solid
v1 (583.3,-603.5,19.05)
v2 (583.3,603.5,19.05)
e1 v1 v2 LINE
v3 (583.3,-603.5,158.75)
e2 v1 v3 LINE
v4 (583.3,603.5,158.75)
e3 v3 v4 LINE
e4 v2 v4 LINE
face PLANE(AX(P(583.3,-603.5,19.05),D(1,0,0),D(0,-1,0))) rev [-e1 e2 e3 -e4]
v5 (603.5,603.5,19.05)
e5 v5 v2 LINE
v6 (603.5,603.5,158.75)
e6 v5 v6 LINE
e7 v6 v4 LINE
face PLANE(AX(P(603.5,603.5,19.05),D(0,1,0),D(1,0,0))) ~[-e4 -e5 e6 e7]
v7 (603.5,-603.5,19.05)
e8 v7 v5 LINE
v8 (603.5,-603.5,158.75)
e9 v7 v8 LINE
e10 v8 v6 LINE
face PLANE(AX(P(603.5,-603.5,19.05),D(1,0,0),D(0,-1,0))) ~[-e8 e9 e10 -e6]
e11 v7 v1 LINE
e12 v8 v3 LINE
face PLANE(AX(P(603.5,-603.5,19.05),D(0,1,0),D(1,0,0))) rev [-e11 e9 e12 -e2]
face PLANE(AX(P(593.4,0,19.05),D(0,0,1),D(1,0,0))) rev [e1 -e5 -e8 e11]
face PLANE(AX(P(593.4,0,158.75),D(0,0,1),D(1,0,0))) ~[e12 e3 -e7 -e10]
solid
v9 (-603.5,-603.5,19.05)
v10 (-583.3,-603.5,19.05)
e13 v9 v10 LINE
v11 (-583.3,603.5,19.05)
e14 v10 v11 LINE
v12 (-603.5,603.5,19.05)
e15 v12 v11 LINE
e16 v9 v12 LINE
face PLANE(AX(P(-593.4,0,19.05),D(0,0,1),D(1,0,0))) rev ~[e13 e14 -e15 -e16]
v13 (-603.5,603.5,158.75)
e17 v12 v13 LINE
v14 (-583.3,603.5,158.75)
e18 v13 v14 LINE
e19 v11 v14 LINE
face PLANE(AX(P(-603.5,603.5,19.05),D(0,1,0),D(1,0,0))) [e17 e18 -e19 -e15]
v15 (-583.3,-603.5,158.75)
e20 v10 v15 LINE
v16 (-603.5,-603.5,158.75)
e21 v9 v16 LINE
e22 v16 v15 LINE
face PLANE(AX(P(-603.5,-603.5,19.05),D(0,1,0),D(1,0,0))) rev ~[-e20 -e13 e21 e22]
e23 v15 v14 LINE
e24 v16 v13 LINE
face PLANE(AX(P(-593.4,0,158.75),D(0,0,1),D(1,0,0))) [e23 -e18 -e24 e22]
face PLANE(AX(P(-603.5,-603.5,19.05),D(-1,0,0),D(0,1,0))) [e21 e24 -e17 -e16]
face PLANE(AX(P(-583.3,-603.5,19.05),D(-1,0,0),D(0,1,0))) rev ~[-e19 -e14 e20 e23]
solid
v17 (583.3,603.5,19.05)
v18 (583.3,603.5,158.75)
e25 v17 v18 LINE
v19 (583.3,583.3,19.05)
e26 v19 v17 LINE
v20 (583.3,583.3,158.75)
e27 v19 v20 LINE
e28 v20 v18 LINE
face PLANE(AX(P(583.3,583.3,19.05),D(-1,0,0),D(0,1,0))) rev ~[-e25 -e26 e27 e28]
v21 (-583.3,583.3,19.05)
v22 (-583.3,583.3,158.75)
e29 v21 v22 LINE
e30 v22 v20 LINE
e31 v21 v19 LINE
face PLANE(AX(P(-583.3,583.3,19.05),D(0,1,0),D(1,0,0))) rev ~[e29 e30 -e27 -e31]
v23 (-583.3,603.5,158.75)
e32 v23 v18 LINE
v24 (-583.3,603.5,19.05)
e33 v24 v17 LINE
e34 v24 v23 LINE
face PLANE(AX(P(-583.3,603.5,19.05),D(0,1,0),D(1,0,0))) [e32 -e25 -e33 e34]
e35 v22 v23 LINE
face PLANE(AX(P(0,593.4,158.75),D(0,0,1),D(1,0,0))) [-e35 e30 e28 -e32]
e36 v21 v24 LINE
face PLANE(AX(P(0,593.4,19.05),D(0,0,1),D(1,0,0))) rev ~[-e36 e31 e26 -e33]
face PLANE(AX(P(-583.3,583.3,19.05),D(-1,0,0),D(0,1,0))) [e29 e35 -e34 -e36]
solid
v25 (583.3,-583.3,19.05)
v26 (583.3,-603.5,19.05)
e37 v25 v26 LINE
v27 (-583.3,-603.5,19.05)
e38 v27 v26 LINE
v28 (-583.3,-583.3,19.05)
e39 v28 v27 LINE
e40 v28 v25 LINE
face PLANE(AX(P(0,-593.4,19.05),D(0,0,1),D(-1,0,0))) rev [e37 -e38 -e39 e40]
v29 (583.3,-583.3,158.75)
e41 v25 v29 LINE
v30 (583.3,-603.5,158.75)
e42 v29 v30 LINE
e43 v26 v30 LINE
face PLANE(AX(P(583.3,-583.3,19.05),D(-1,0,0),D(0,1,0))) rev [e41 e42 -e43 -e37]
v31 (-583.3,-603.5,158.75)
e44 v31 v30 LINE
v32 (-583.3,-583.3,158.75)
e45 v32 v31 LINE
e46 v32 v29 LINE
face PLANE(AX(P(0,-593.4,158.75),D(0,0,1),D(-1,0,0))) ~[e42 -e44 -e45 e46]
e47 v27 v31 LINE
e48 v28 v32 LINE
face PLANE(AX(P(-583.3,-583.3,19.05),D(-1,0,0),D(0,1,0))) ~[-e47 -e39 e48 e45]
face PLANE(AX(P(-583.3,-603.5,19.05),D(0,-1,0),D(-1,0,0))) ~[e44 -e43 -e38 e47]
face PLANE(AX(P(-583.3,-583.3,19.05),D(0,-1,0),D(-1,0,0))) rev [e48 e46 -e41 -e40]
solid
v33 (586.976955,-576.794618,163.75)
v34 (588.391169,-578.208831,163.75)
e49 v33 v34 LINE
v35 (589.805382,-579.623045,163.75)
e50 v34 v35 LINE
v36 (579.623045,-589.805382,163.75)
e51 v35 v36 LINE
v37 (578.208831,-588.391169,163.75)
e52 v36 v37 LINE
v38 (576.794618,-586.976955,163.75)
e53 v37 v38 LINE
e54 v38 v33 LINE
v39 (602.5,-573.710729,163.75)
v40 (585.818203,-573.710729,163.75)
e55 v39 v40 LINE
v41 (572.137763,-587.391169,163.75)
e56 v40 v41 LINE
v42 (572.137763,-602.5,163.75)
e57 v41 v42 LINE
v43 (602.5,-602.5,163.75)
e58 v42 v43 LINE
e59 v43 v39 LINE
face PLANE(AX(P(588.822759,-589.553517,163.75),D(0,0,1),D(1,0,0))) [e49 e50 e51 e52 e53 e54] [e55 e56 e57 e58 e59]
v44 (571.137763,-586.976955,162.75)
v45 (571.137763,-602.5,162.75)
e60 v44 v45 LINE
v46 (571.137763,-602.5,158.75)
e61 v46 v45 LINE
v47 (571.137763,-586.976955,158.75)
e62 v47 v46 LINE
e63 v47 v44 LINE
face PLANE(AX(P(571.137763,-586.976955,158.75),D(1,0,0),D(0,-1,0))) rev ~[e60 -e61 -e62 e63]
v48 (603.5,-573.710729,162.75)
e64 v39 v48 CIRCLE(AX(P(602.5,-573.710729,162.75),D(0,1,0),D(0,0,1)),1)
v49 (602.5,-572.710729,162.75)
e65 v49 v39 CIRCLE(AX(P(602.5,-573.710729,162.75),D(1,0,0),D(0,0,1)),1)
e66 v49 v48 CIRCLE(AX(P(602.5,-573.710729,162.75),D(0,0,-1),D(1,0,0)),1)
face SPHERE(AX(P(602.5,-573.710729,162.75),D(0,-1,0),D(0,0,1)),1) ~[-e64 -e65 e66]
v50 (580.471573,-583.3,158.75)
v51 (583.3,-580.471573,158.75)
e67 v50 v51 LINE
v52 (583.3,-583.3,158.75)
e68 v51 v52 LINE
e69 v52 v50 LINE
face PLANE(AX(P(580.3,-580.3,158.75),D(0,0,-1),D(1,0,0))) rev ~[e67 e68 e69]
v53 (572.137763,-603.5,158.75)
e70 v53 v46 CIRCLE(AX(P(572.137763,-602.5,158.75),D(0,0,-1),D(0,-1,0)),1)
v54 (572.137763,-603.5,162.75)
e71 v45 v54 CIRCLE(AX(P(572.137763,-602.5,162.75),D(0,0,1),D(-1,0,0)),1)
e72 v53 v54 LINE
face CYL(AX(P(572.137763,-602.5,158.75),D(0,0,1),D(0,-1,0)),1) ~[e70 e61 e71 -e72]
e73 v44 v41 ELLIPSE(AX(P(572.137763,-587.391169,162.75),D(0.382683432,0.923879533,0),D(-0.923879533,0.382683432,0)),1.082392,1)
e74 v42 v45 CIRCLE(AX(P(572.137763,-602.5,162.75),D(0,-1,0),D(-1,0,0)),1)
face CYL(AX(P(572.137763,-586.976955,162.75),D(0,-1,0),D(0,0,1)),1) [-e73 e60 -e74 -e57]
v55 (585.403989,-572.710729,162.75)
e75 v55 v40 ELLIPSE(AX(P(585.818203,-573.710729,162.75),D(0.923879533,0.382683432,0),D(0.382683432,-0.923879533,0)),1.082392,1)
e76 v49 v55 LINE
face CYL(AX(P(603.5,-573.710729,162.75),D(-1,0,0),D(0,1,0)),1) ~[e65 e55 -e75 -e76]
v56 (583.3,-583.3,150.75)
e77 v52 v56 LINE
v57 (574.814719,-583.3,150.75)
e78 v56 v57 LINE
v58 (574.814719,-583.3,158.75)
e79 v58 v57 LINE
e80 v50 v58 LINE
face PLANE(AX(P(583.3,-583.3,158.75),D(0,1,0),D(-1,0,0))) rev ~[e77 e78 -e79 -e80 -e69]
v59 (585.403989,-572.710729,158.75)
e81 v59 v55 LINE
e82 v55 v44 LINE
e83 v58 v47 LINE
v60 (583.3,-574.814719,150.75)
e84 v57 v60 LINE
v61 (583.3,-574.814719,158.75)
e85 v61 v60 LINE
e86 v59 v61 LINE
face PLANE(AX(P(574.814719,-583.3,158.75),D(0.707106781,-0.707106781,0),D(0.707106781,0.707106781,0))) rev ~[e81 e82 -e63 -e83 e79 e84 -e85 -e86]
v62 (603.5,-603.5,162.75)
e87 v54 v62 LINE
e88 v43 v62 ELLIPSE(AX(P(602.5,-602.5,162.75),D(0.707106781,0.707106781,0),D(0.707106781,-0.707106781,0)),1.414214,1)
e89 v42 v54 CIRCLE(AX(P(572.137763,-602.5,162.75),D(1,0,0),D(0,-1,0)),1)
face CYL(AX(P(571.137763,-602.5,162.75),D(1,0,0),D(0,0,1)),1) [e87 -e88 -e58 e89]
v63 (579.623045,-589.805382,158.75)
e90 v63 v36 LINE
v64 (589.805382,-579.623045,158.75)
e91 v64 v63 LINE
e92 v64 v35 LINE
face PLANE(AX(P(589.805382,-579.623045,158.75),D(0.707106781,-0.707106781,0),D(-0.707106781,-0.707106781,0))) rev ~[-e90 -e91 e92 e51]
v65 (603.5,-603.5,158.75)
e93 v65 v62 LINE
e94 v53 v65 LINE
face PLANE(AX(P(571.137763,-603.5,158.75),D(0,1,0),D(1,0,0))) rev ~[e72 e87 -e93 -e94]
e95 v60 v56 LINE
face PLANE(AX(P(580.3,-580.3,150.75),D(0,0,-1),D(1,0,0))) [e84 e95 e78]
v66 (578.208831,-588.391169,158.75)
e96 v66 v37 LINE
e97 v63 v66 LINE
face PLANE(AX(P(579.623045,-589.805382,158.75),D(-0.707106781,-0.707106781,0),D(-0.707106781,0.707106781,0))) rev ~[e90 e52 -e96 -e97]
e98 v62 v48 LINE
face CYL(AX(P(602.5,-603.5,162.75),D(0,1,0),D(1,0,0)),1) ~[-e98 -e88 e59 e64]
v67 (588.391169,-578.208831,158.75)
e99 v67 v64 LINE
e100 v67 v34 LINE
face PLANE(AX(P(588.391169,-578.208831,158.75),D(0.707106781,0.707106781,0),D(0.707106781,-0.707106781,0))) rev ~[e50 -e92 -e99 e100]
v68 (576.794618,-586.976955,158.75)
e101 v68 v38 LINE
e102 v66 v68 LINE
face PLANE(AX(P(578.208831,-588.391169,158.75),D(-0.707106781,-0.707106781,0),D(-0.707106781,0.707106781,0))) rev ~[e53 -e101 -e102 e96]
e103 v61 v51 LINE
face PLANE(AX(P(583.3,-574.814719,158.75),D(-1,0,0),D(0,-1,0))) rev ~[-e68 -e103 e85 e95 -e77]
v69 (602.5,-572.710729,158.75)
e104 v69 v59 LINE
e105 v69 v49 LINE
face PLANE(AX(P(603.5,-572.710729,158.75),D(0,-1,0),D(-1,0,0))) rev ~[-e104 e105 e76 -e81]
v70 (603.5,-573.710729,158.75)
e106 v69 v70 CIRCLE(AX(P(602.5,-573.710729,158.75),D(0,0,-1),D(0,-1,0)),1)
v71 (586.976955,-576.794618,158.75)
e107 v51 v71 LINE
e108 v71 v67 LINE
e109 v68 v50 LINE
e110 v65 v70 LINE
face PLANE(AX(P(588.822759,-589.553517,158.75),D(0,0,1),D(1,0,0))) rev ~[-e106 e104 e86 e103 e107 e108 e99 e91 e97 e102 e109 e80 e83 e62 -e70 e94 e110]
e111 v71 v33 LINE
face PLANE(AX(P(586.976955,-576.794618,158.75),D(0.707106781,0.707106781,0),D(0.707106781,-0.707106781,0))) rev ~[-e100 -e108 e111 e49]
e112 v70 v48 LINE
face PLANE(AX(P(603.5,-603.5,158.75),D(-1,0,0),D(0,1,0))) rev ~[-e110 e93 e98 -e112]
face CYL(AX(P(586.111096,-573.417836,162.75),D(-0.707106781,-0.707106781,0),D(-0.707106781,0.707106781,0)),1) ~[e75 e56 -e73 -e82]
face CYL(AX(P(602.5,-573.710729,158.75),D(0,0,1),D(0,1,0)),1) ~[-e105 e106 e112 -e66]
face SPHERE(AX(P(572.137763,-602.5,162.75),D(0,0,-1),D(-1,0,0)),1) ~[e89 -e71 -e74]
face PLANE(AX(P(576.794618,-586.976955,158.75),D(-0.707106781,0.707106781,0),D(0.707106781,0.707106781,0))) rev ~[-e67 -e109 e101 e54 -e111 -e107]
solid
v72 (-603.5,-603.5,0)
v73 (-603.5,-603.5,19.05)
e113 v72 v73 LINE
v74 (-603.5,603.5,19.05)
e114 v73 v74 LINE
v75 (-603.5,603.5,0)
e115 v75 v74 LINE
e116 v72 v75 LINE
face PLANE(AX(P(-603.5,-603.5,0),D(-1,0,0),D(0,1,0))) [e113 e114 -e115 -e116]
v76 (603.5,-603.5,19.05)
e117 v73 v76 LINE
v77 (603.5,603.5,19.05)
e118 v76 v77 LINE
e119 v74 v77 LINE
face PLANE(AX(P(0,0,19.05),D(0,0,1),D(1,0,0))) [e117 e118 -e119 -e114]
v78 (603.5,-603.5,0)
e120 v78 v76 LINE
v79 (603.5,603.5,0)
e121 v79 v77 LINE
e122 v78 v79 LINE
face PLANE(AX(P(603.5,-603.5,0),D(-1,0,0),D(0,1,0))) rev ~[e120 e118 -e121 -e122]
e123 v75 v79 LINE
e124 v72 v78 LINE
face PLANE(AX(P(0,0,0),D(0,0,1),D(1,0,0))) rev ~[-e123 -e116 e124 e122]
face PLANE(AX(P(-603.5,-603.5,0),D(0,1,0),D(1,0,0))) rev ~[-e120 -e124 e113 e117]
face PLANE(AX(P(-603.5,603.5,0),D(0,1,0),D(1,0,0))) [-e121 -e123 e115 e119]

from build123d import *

# Parameters (mm, degrees)
F0_W      = 1207
F0_H      = 1207
F1_DEPTH  = 19.05
F2_W      = 20.2
F2_H      = 1207
F3_DEPTH  = 139.7
F5_W      = 1166.6
F5_H      = 20.2
F6_DEPTH  = 139.7
F10_DEPTH = 5
F12_DEPTH = 8
F14_DEPTH = 5
F15_R     = 1


# Not quite as in the source:
# - two fillets or chamfers of one size are made in one step


with BuildPart() as f1:
    # F0 (on Top) → F1 (new body)
    with BuildSketch(Plane.XY):
        Rectangle(F0_W, F0_H)
    extrude(amount=F1_DEPTH)


with BuildPart() as f3:
    # F2 (on face) → F3 (new body)
    with BuildSketch(Plane.XY.offset(19.05)):
        with Locations((-593.4, 0)):
            Rectangle(F2_W, F2_H)
    extrude(amount=F3_DEPTH)


with BuildPart() as f4_1:
    # F4: instance of F3
    add(f3.part.mirror(Plane.YZ))


with BuildPart() as f6:
    # F5 (on face) → F6 (new body)
    with BuildSketch(Plane.XY.offset(19.05)):
        with Locations((0, 593.4)):
            Rectangle(F5_W, F5_H)
    extrude(amount=F6_DEPTH)


with BuildPart() as f7_1:
    # F7: instance of F6
    add(f6.part.mirror(Plane.XZ))


with BuildPart() as f10:
    # F9 (on offset) → F10 (new body)
    with BuildSketch(Plane.XY.offset(158.75)):
        Polygon((585.4039892925, -572.7107293333), (583.3, -574.8147186258), (583.3, -580.4715728753), (586.9769552622, -576.7946176131), (588.3911688245, -578.2088311755), (589.8053823869, -579.6230447378), (583.3, -586.1284271247), (583.3, -591.7852813742), (593.8063995238, -581.2788818505), align=None)
        Polygon((583.3, -580.4715728753), (583.3, -574.8147186258), (574.8147186258, -583.3), (580.4715728753, -583.3), align=None)
        Polygon((580.4715728753, -583.3), (574.8147186258, -583.3), (571.1377633636, -586.9769552622), (579.6230447378, -595.4622366364), (583.3, -591.7852813742), (583.3, -586.1284271247), (579.6230447378, -589.8053823869), (578.2088311755, -588.3911688245), (576.7946176131, -586.9769552622), align=None)
    extrude(amount=F10_DEPTH)

    # F11 (on face) → F12 (join)
    with BuildSketch(Plane(origin=(0, 0, 158.75), x_dir=(1, 0, 0), z_dir=(0, 0, -1))):
        Polygon((583.3, 583.3), (574.8147186258, 583.3), (583.3, 574.8147186258), align=None)
    extrude(amount=F12_DEPTH)

    # F13 (on face) → F14 (join)
    with BuildSketch(Plane.XY.offset(158.75)):
        Polygon((603.5, -572.7107293333), (585.4039892925, -572.7107293333), (571.1377633636, -586.9769552622), (571.1377633636, -603.5), (583.3, -603.5), (603.5, -603.5), align=None)
        Polygon((576.7946176131, -586.9769552622), (586.9769552622, -576.7946176131), (589.8053823869, -579.6230447378), (579.6230447378, -589.8053823869), align=None, mode=Mode.SUBTRACT)
    extrude(amount=F14_DEPTH)

    # F15
    f15_edges = [f10.edges().sort_by_distance(p)[0] for p in [
        (578.270876, -579.843842, 163.75),
        (571.137763, -603.5, 161.25),
        (571.137763, -595.238478, 163.75),
        (587.318882, -603.5, 163.75),
        (603.5, -588.105365, 163.75),
        (594.451995, -572.710729, 163.75),
        (603.5, -572.710729, 161.25),
    ]]
    fillet(f15_edges, radius=F15_R)


solid = Compound([f1.part, f3.part, f4_1.part, f6.part, f7_1.part, f10.part])
